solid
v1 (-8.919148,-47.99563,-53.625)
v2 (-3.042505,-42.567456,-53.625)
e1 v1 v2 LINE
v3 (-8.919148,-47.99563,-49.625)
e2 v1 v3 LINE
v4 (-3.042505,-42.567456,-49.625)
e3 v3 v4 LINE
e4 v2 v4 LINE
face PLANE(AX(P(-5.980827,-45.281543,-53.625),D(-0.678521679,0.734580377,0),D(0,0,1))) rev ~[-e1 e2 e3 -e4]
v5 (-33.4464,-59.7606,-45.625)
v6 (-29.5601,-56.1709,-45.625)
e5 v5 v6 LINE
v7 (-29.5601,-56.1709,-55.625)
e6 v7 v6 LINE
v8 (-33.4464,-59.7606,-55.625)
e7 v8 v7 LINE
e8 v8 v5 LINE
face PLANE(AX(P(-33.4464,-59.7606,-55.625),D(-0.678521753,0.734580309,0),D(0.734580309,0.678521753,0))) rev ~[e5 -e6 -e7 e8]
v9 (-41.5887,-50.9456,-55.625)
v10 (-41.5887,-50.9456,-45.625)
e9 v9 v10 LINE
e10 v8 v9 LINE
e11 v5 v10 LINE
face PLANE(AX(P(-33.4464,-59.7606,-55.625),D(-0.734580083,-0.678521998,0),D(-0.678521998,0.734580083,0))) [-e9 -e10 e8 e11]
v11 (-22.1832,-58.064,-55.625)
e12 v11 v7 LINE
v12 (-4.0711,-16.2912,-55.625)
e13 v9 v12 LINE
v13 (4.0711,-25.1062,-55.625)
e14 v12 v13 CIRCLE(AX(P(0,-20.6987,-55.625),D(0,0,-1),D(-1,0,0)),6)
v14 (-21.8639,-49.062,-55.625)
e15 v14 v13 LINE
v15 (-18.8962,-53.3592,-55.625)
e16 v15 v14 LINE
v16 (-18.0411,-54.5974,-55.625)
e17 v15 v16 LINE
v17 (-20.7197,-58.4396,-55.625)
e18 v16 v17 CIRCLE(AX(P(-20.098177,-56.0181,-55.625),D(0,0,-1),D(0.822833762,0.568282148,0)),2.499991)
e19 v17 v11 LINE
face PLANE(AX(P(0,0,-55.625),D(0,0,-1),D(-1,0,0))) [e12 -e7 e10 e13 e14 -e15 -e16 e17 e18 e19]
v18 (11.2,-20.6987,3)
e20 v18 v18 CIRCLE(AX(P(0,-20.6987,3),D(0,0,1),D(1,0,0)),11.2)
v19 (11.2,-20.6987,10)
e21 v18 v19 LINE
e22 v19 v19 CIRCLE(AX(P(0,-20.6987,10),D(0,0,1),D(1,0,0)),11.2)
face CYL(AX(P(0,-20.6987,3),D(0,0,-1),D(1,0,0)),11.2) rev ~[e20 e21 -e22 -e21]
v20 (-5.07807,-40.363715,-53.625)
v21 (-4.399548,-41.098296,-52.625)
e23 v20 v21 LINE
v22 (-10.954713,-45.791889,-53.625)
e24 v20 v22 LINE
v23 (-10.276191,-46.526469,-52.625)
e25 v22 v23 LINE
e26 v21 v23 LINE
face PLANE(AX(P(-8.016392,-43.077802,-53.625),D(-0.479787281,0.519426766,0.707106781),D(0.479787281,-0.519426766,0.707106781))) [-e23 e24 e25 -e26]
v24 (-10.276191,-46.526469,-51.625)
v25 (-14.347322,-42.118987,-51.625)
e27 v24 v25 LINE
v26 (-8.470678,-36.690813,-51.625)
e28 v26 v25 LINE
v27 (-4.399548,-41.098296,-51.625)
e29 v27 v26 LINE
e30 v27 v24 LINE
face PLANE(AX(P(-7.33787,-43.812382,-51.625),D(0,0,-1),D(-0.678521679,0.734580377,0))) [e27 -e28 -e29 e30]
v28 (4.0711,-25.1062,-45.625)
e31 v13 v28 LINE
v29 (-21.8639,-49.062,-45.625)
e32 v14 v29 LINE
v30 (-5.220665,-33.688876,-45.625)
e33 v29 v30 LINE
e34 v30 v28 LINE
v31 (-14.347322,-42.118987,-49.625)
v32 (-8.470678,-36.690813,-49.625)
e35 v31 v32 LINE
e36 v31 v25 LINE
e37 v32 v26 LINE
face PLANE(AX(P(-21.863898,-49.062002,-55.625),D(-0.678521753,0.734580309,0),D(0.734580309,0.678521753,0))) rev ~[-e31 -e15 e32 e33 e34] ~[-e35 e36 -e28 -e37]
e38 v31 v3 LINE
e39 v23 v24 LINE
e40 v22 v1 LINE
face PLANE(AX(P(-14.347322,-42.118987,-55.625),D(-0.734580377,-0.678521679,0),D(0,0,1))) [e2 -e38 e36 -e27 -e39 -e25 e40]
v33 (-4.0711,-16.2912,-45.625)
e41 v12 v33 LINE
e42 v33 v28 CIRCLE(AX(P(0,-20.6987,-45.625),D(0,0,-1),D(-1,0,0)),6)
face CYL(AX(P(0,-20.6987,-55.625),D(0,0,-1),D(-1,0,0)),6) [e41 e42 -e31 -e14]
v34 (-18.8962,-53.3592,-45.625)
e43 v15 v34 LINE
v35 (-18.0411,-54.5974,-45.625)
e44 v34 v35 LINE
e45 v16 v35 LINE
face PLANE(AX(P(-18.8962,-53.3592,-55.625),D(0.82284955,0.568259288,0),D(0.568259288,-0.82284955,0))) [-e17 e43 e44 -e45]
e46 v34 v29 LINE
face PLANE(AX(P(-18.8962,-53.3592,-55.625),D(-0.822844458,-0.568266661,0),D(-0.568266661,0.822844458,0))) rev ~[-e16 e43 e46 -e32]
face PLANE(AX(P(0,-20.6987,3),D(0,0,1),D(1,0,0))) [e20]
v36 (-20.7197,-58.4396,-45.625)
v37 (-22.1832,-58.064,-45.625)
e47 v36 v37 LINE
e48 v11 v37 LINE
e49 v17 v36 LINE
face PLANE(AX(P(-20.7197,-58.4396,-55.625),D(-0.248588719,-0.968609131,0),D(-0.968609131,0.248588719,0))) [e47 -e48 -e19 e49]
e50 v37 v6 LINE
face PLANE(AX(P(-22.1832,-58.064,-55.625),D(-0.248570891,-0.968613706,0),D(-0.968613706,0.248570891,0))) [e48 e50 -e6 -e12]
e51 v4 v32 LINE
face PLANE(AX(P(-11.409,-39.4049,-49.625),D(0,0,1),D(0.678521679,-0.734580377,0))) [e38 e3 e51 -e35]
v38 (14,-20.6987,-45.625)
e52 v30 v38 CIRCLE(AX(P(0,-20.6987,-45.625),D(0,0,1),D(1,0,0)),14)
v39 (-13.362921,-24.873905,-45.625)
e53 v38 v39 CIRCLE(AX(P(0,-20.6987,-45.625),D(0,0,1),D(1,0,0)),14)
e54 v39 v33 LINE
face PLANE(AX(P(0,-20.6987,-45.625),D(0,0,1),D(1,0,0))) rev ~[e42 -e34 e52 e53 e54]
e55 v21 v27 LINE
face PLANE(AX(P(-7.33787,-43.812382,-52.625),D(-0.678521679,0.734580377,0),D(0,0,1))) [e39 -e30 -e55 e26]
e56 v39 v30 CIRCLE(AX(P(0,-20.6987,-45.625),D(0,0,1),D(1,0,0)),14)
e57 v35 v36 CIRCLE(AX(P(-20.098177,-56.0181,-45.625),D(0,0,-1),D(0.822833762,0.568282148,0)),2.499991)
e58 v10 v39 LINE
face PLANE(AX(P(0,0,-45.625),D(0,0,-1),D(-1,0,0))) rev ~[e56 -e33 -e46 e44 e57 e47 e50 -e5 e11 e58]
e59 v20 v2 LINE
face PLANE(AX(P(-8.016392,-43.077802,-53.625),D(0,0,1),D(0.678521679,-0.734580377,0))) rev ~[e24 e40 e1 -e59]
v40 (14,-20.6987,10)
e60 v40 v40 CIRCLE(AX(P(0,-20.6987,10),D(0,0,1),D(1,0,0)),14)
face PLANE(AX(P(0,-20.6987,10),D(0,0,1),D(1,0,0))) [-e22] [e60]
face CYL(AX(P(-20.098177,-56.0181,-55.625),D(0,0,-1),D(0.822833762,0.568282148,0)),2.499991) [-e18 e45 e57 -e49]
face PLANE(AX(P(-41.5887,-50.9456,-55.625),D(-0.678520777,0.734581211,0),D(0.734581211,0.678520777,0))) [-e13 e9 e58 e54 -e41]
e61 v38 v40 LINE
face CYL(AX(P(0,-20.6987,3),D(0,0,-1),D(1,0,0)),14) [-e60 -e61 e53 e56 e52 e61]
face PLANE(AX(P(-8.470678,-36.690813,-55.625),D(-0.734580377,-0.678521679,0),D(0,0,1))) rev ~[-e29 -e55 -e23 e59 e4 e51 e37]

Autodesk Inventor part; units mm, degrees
ref_plane "Work Plane3" through (-4, -4, -10) normal (0, 0, -1) x (0, 1, 0)
ref_plane "Work Plane6" through (0, 0, -10) normal (0, 0, -1) x (-1, 0, 0)
ref_plane "Work Plane4" through (-20.0043, -85.0498, -55.625) normal (0, 0, -1) x (0, 1, 0)
ref_plane "Work Plane5" through (0, 0, -55.625) normal (0, 0, -1) x (-1, 0, 0)
sketch "Sketch6" plane through (0, 0, -55.625) normal (0, 0, -1) x (-1, 0, 0)
  arc A0 (75.4786, 4.8454) -> (74.2911, 5.1636) centre (74.7523, 4.5099) ccw projected
  arc A1 (56.7048, 9.4732) -> (74.2911, 5.1636) centre (67.3726, 14.9684) ccw projected
  line L0 (55.5232, 13.0737) -> (56.7048, 9.4732) projected
  arc A2 (55.5232, 13.0737) -> (41.5887, -50.9456) centre (67.3725, -23.0316) ccw projected
  line L1 (33.4464, -59.7606) -> (41.5887, -50.9456) projected
  arc A3 (33.4464, -59.7606) -> (104.1015, -56.9577) centre (67.3725, -23.0316) ccw projected
  line L2 (112.9165, -65.0999) -> (104.1015, -56.9577) projected
  arc A4 (112.9165, -65.0999) -> (124.3718, -47.4258) centre (67.3725, -23.0316) ccw projected
  line L3 (113.3397, -42.7043) -> (124.3718, -47.4258) projected
  arc A5 (113.3397, -42.7043) -> (116.0567, -34.4268) centre (67.3725, -23.0316) ccw projected
  arc A6 (116.0567, -34.4268) -> (112.8612, -32.4083) centre (114.1093, -33.971) ccw projected
  arc A7 (103.4777, -34.8812) -> (112.8612, -32.4083) centre (105.3725, -23.0317) ccw projected
  line L4 (99.8772, -33.6995) -> (103.4777, -34.8812) projected
  arc A8 (95.5677, -16.1132) -> (99.8772, -33.6995) centre (105.3725, -23.0317) ccw projected
  arc A9 (95.5677, -16.1132) -> (95.2495, -14.9257) centre (94.9141, -15.652) ccw projected
  arc A10 (88.3311, -2.9425) -> (95.2495, -14.9257) centre (100.2815, -4.0317) ccw projected
  arc A11 (88.3311, -2.9425) -> (87.4618, -2.0732) centre (87.5344, -2.8699) ccw projected
  arc A12 (75.4786, 4.8454) -> (87.4618, -2.0732) centre (86.3726, 9.8773) ccw projected
  circle A13 centre (67.3725, -23.0316) radius 18 projected
  line L5 (41.5887, -50.9456) -> (4.0711, -16.2912)
  line L6 (33.4464, -59.7606) -> (-4.0711, -25.1062)
  line L7 (-32.6275, -120.0316) -> (-32.6275, 19.9684) projected
  line L8 (-32.6275, 19.9684) -> (137.3725, 19.9684) projected
  line L9 (33.4464, -59.7606) -> (41.5887, -50.9456)
  circle A14 centre (0, -20.6987) radius 6
  arc A15 (18.8962, -53.3592) -> (15.9689, -49.5949) centre (16.8391, -51.9385) ccw
  line L10 (18.8962, -53.3592) -> (18.0411, -54.5974)
  arc A16 (18.0411, -54.5974) -> (20.7197, -58.4396) centre (20.0982, -56.0181) ccw
  line L11 (20.7197, -58.4396) -> (22.1832, -58.064)
  arc A17 (24.7026, -62.1127) -> (22.1832, -58.064) centre (22.8047, -60.4856) ccw
  line L12 (24.7026, -62.1127) -> (10.325, -78.8833)
  arc A18 (-4.734, -57.2821) -> (10.325, -78.8833) centre (0, -70.0316) ccw
  line L13 (-4.734, -57.2821) -> (15.9689, -49.5949)
  circle A19 centre (0, -70.0316) radius 5.6
  line L14 (18.8962, -53.3592) -> (21.8639, -49.062)
  line L15 (22.1832, -58.064) -> (29.5601, -56.1709)
extrude "Extrusion5" add sketch "Sketch6" against normal blind 10 contours L1 L6 A14 L5 | A14 | L15 L11 A16 L10 L14 L6
sketch "Sketch7" plane through (0, -20.6987, -45.625) normal (0, 0, 1) x (1, 0, 0)
  circle A0 centre (0, 0) radius 11.2
  circle A1 centre (0, 0) radius 14
  point P0 (0, 20.6987)
  dimension "d14" = 22.4
  dimension "d15" = 28
ref_plane "Work Plane7" through (-4, -24.6987, -7) normal (0, 0, -1) x (0, 1, 0)
extrude "Extrusion6" add sketch "Sketch7" along normal blind 48.625 contours A0 | A1
sketch "Sketch8" plane through (0, -20.6987, 3) normal (0, 0, 1) x (1, 0, 0)
  circle A0 centre (0, 0) radius 4
  circle A1 centre (0, 0) radius 11.2
  circle A2 centre (0, 0) radius 14 projected
  point P0 (0, 20.6987)
  dimension "d18" = 8
  dimension "d19" = 22.4
extrude "Extrusion7" add sketch "Sketch8" along normal blind 7 contours A2
ref_plane "Work Plane8" through (-11.409, -39.4049, -55.625) normal (-0.7345804, -0.6785217, 0) x (0, 0, 1)
sketch "Sketch10" plane through (-11.409, -39.4049, -55.625) normal (-0.7345804, -0.6785217, 0) x (0, 0, 1)
  line L0 (0, 0) -> (0, 12) projected
  line L1 (0, 12) -> (10, 12)
  line L2 (10, 12) -> (10, 0)
  line L3 (10, 0) -> (0, 0)
  line L4 (0, 0) -> (0, 12)
  line L5 (2, 0) -> (2, -8)
  line L6 (2, -8) -> (7, -8)
  line L7 (7, -8) -> (7, -4)
  line L8 (7, -4) -> (5, -6)
  line L9 (5, -6) -> (4, -6)
  line L10 (4, -6) -> (4, 0)
  line L11 (6, 0) -> (6, -8)
  line L12 (6, -8) -> (1, -8)
  line L13 (1, -8) -> (1, -4)
  line L14 (1, -4) -> (3, -6)
  line L15 (3, -6) -> (4, -6)
  point P0 (55.625, 21.2048)
  point P1 (6, 0)
  point P2 (2, -5)
  point P3 (6, -8)
  dimension "d23" = 8
  dimension "d24" = 5
  dimension "d25" = 4
  dimension "d26" = 45
  dimension "d27" = 2
  dimension "d28" = 2
  dimension "d29" = 2
extrude "Extrusion8" add sketch "Sketch10" along normal mid plane 8 contours L3 L11 L8 L9 L10 | L14 L15 L9 L8 L11 L6 L5
properties part number "ReverserClicker"
